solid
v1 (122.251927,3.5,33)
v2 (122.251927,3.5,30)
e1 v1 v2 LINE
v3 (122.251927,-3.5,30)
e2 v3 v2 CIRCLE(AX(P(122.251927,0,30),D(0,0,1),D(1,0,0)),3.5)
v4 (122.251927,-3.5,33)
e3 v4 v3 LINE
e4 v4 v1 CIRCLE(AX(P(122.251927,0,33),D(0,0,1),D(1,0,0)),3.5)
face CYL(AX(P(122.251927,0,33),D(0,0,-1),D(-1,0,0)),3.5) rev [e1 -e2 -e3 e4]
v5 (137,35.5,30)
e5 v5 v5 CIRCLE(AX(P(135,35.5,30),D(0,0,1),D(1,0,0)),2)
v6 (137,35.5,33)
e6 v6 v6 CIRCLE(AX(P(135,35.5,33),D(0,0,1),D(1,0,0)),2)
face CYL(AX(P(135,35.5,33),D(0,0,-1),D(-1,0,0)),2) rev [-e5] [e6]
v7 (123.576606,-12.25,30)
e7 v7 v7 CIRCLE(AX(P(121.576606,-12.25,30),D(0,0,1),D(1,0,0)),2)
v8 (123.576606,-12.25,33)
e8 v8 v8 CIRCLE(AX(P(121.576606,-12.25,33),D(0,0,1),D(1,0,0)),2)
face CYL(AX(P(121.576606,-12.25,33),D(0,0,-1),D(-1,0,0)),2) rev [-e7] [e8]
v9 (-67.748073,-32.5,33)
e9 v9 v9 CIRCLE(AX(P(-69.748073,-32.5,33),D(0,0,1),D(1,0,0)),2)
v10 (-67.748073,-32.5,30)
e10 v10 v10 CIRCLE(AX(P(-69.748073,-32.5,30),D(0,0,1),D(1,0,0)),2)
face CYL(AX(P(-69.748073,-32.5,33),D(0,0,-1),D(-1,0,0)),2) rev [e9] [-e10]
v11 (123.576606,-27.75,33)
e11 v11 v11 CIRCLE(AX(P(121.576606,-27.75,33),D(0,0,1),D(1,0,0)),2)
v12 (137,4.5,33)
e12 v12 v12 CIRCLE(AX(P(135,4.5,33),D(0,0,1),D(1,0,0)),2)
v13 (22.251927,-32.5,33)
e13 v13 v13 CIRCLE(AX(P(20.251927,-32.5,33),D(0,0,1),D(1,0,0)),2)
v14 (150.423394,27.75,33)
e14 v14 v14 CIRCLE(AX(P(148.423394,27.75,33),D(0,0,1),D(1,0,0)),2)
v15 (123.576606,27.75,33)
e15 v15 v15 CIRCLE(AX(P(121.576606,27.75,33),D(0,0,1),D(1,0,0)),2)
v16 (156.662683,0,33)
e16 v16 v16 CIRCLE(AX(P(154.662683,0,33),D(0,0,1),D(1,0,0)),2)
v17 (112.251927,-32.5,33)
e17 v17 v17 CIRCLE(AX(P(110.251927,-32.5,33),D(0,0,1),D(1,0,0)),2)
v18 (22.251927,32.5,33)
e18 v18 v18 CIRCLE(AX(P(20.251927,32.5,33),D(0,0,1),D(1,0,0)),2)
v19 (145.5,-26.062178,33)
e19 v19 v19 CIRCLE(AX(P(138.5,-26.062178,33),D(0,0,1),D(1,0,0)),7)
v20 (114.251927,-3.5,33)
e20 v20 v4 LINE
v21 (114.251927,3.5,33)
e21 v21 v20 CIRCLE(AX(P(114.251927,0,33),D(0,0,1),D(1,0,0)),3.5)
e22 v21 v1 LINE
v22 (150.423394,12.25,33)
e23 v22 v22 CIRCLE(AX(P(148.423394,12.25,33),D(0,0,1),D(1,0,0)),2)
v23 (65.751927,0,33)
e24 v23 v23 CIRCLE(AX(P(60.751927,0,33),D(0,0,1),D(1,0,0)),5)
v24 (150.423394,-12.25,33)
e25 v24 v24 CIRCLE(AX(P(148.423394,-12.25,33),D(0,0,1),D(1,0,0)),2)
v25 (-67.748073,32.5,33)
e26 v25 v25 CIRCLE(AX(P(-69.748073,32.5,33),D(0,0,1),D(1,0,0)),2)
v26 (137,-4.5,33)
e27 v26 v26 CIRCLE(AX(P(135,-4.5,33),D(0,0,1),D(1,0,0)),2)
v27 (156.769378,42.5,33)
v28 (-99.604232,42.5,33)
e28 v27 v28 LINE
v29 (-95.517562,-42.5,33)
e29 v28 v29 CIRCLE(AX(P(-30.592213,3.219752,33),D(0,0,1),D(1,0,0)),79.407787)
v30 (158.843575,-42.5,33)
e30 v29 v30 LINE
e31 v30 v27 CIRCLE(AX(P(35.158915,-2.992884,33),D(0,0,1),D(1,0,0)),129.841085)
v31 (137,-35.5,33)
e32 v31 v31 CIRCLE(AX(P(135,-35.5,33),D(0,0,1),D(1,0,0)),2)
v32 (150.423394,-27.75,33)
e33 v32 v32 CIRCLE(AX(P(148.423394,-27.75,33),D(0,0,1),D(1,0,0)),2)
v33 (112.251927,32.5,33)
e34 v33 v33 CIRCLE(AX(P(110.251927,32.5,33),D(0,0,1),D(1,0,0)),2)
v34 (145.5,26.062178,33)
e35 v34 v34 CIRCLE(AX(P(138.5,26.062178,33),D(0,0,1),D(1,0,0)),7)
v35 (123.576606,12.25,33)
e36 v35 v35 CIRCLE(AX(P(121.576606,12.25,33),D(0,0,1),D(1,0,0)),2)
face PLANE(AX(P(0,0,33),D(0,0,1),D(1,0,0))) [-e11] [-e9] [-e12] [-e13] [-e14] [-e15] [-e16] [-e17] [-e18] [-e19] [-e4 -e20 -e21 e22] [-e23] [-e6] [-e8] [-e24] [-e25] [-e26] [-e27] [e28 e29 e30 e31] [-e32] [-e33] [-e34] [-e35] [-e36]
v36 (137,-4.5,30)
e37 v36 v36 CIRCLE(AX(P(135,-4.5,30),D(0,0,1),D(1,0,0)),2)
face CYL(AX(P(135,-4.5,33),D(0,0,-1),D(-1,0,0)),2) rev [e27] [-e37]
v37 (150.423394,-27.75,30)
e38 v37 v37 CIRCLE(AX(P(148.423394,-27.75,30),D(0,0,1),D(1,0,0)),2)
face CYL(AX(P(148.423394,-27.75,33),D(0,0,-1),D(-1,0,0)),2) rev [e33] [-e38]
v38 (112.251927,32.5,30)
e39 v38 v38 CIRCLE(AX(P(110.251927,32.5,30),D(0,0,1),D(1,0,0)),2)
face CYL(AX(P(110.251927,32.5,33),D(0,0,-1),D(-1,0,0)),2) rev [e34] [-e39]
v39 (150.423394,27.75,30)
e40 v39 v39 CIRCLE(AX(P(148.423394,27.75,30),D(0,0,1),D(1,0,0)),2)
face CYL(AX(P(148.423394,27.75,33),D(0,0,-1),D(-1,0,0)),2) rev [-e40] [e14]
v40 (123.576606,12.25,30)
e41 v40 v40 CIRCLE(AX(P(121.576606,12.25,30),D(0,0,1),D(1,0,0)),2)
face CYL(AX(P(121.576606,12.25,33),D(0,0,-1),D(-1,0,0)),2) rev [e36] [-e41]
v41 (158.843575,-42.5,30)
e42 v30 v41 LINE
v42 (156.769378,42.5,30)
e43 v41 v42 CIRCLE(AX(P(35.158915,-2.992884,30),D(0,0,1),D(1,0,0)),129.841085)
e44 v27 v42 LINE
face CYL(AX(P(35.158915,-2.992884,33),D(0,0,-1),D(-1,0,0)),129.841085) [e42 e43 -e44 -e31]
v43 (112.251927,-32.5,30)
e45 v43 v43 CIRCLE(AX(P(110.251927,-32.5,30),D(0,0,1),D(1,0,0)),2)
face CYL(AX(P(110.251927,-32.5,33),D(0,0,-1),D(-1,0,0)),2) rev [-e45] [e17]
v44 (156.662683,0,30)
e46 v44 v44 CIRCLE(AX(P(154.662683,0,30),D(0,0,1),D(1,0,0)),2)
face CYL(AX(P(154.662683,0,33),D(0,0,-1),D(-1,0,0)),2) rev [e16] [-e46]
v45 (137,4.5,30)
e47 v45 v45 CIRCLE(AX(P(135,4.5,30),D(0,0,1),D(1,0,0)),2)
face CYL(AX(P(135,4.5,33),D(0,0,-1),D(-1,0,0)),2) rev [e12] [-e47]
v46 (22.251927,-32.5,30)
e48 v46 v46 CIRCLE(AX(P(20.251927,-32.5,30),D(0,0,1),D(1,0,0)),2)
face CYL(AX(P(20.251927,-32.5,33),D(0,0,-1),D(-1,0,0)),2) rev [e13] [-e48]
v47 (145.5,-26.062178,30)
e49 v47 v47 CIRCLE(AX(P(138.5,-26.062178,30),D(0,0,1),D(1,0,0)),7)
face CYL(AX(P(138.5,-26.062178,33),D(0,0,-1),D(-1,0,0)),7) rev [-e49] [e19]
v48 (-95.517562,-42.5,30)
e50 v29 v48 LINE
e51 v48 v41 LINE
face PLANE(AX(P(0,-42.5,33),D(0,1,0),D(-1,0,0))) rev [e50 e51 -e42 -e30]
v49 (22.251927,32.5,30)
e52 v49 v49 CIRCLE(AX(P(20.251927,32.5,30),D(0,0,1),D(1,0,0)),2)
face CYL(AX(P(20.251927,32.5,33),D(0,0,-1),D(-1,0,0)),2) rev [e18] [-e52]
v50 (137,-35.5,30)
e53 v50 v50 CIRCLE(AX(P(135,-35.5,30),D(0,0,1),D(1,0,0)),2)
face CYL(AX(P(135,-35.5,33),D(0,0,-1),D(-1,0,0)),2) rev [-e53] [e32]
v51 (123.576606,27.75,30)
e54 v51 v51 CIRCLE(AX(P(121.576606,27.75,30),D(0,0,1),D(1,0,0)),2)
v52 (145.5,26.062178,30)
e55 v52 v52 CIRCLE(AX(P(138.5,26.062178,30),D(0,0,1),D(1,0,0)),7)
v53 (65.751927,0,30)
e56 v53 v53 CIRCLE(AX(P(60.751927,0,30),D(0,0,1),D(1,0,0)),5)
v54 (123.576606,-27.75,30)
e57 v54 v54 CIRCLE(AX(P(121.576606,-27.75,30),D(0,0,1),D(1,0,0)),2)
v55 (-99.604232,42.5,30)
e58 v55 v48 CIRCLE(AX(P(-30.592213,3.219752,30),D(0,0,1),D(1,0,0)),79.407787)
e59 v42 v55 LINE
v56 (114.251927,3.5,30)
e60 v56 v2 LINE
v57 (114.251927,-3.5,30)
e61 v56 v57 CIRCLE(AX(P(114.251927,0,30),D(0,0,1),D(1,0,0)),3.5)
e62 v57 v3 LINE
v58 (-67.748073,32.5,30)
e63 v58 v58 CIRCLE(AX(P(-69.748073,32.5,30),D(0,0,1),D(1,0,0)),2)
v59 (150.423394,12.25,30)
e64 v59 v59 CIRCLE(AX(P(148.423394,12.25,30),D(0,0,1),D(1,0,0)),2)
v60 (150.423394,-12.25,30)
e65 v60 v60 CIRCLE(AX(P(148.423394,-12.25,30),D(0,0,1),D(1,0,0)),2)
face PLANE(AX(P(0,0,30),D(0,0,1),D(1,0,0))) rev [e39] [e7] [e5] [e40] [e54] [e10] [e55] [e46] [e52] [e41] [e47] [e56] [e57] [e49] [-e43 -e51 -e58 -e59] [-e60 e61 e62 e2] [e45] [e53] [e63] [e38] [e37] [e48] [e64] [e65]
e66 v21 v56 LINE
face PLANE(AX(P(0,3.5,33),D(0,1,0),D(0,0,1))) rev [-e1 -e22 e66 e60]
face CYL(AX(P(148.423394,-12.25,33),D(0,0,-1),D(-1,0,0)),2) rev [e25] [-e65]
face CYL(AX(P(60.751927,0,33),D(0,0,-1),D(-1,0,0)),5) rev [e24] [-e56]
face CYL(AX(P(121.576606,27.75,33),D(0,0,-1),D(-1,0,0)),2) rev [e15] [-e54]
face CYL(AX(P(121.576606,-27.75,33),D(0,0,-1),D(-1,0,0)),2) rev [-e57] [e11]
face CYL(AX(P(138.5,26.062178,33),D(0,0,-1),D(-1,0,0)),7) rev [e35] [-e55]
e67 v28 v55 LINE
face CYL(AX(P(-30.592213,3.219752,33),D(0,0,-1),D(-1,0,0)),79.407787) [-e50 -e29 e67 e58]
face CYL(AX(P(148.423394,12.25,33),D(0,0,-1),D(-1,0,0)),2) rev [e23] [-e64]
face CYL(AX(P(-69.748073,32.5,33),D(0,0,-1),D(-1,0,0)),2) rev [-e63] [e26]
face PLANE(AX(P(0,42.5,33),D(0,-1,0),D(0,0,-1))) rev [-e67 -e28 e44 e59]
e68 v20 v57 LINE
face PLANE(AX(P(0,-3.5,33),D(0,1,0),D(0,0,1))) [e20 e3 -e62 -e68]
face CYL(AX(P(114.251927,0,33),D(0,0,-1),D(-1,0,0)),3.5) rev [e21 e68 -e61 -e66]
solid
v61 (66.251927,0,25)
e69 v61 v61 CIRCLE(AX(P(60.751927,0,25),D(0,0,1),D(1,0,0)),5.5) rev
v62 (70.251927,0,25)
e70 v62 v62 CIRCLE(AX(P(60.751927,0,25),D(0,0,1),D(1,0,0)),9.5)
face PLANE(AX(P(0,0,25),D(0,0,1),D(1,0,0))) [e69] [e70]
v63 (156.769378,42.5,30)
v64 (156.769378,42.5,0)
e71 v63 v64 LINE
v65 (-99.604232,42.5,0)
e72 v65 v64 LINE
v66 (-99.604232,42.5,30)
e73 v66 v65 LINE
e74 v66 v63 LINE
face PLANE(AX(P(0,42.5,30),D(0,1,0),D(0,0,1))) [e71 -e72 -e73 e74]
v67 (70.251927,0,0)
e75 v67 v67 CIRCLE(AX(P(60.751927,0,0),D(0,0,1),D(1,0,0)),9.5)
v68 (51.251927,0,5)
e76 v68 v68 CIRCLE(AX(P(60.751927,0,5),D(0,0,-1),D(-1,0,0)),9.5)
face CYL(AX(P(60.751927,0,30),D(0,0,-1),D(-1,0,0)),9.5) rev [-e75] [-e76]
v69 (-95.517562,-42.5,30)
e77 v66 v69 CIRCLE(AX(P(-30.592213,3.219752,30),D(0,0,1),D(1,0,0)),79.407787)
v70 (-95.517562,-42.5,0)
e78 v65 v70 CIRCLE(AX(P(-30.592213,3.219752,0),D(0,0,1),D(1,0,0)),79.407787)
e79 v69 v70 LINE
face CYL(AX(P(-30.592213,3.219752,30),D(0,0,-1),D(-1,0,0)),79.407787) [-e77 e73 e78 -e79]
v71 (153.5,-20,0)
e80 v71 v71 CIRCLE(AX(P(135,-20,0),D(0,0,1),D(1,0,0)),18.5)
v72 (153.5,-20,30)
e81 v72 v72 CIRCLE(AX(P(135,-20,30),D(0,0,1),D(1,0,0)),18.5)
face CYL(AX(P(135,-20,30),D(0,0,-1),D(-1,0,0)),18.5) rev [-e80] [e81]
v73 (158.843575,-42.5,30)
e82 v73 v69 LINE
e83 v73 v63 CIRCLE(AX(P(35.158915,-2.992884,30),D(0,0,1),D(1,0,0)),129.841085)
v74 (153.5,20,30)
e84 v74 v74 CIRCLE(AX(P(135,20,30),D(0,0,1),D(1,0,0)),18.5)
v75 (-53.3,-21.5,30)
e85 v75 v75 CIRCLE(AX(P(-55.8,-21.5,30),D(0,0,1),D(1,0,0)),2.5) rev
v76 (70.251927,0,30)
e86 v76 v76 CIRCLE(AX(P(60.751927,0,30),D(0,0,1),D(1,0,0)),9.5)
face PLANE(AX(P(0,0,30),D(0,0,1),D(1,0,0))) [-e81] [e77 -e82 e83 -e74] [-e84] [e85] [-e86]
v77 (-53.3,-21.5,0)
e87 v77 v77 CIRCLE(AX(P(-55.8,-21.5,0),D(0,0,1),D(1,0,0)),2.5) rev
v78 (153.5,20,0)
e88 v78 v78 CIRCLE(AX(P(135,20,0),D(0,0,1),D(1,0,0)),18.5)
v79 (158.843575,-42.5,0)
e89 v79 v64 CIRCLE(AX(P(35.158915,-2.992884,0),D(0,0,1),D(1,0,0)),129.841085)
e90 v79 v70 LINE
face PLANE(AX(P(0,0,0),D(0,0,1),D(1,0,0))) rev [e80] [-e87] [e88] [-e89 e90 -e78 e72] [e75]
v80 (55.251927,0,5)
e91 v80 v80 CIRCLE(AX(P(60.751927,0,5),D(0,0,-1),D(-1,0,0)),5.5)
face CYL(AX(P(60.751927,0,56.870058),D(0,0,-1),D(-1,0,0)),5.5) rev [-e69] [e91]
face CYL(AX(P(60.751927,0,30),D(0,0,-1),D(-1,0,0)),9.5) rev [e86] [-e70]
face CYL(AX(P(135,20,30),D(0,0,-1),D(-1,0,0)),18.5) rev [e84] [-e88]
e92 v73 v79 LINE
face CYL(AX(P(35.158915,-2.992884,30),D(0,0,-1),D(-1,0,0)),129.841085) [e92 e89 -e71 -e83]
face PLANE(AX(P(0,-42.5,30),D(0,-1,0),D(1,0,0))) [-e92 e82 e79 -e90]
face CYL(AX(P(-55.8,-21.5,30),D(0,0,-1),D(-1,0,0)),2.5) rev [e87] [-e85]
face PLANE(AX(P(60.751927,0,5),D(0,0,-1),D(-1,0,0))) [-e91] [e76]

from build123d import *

# Parameters (mm, degrees)
BOSS_EXTRUDE1_OUTLINE_R   = 2.5
BOSS_EXTRUDE1_OUTLINE_R_2 = 18.5
BOSS_EXTRUDE1_OUTLINE_R_3 = 9.5
BOSS_EXTRUDE1_DEPTH       = 30
SKETCH3_R                 = 2
SKETCH3_R_2               = 2.5
SKETCH3_R_3               = 18.5
SKETCH3_R_4               = 9.5
SKETCH3_R_5               = 7
SKETCH3_R_6               = 5
BOSS_EXTRUDE2_DEPTH       = 3
BOSS_EXTRUDE3_START       = -5
SKETCH6_R                 = 9.5
SKETCH6_R_2               = 5.5
BOSS_EXTRUDE3_DEPTH       = 20


# Read off the part's stored shape, not the designer's step: Boss-Extrude1
with BuildPart() as part:
    # Boss-Extrude1 outline → Boss-Extrude1 (new body)
    with BuildSketch(Plane.XY):
        with BuildLine():
            ThreePointArc((-99.604231658, 42.5), (-109.908381706, -0.593648146), (-95.517561959, -42.5))
            Line((-95.517561959, -42.5), (158.843575198, -42.5))
            ThreePointArc((158.843575198, -42.5), (164.961358829, 0.174595682), (156.769378449, 42.5))
            Line((156.769378449, 42.5), (-99.604231658, 42.5))
        make_face()
        with Locations((-55.8, -21.5)):
            Circle(BOSS_EXTRUDE1_OUTLINE_R, mode=Mode.SUBTRACT)
        with Locations((135, -20)):
            Circle(BOSS_EXTRUDE1_OUTLINE_R_2, mode=Mode.SUBTRACT)
        with Locations((60.751926796, 0)):
            Circle(BOSS_EXTRUDE1_OUTLINE_R_3, mode=Mode.SUBTRACT)
        with Locations((135, 20)):
            Circle(BOSS_EXTRUDE1_OUTLINE_R_2, mode=Mode.SUBTRACT)
    extrude(amount=BOSS_EXTRUDE1_DEPTH)

    # Sketch6 → Boss-Extrude3 (add)
    with BuildSketch(Plane(origin=(0, 0, 0), x_dir=(-1, 0, 0), z_dir=(0, 0, -1)).offset(BOSS_EXTRUDE3_START)):
        with Locations((-60.751926796, 0)):
            Circle(SKETCH6_R)
        with Locations((-60.751926796, 0)):
            Circle(SKETCH6_R_2, mode=Mode.SUBTRACT)
    extrude(amount=-BOSS_EXTRUDE3_DEPTH)


with BuildPart() as body_2:
    # Sketch3 → Boss-Extrude2 (new body)
    # profile 1 of 7: a face of its own
    with BuildSketch(Plane.XY.offset(30)):
        with BuildLine():
            ThreePointArc((-99.604231658, 42.5), (-109.908381706, -0.593648146), (-95.517561959, -42.5))
            Line((-95.517561959, -42.5), (-88.525744823, -42.5))
            ThreePointArc((-88.525744823, -42.5), (-94.643528454, 0.174595682), (-86.451548074, 42.5))
            Line((-86.451548074, 42.5), (-99.604231658, 42.5))
        make_face()
    # profile 2 of 7: a face of its own
    with BuildSketch(Plane.XY.offset(30)):
        with BuildLine():
            ThreePointArc((-86.451548074, 42.5), (-94.643528454, 0.174595682), (-88.525744823, -42.5))
            Line((-88.525744823, -42.5), (34.333135379, -42.5))
            ThreePointArc((34.333135379, -42.5), (45.108430133, -20.759597294), (48.81557342, 3.219751644))
            ThreePointArc((48.81557342, 3.219751644), (46.172649196, 23.536062273), (38.419805078, 42.5))
            Line((38.419805078, 42.5), (-86.451548074, 42.5))
        make_face()
        with Locations((-69.748073204, -32.5)):
            Circle(SKETCH3_R, mode=Mode.SUBTRACT)
        with Locations((-55.8, -21.5)):
            Circle(SKETCH3_R_2, mode=Mode.SUBTRACT)
        with Locations((20.251926796, -32.5)):
            Circle(SKETCH3_R, mode=Mode.SUBTRACT)
        with Locations((-69.748073204, 32.5)):
            Circle(SKETCH3_R, mode=Mode.SUBTRACT)
        with Locations((20.251926796, 32.5)):
            Circle(SKETCH3_R, mode=Mode.SUBTRACT)
    # profile 3 of 7: a face of its own
    with BuildSketch(Plane.XY.offset(30)):
        with BuildLine():
            ThreePointArc((48.81557342, 3.219751644), (45.108430133, -20.759597294), (34.333135379, -42.5))
            Line((34.333135379, -42.5), (158.843575198, -42.5))
            ThreePointArc((158.843575198, -42.5), (163.451661934, -22.984843715), (165, -2.992884395))
            ThreePointArc((165, -2.992884395), (162.925776657, 20.122833535), (156.769378449, 42.5))
            Line((156.769378449, 42.5), (38.419805078, 42.5))
            ThreePointArc((38.419805078, 42.5), (46.172649196, 23.536062273), (48.81557342, 3.219751644))
        make_face()
        with Locations((110.251926796, -32.5)):
            Circle(SKETCH3_R, mode=Mode.SUBTRACT)
        with Locations((135, -20)):
            Circle(SKETCH3_R_3, mode=Mode.SUBTRACT)
        with Locations((60.751926796, 0)):
            Circle(SKETCH3_R_4, mode=Mode.SUBTRACT)
        with BuildLine():
            ThreePointArc((114.251926796, -3.5), (110.751926796, 0), (114.251926796, 3.5))
            Line((114.251926796, 3.5), (122.251926796, 3.5))
            ThreePointArc((122.251926796, 3.5), (125.751926796, 0), (122.251926796, -3.5))
            Line((122.251926796, -3.5), (114.251926796, -3.5))
        make_face(mode=Mode.SUBTRACT)
        with Locations((154.66268289, 0)):
            Circle(SKETCH3_R, mode=Mode.SUBTRACT)
        with Locations((135, 20)):
            Circle(SKETCH3_R_3, mode=Mode.SUBTRACT)
        with Locations((110.251926796, 32.5)):
            Circle(SKETCH3_R, mode=Mode.SUBTRACT)
    # profile 4 of 7: a face of its own
    with BuildSketch(Plane.XY.offset(30)):
        with Locations((135, 20)):
            Circle(SKETCH3_R_3)
        with Locations((138.5, 26.062177826)):
            Circle(SKETCH3_R_5, mode=Mode.SUBTRACT)
        with Locations((135, 35.5)):
            Circle(SKETCH3_R, mode=Mode.SUBTRACT)
        with Locations((121.576606241, 27.75)):
            Circle(SKETCH3_R, mode=Mode.SUBTRACT)
        with Locations((135, 4.5)):
            Circle(SKETCH3_R, mode=Mode.SUBTRACT)
        with Locations((121.576606241, 12.25)):
            Circle(SKETCH3_R, mode=Mode.SUBTRACT)
        with Locations((148.423393759, 12.25)):
            Circle(SKETCH3_R, mode=Mode.SUBTRACT)
        with Locations((148.423393759, 27.75)):
            Circle(SKETCH3_R, mode=Mode.SUBTRACT)
    # profile 5 of 7: a face of its own
    with BuildSketch(Plane.XY.offset(30)):
        with Locations((135, -20)):
            Circle(SKETCH3_R_3)
        with Locations((135, -35.5)):
            Circle(SKETCH3_R, mode=Mode.SUBTRACT)
        with Locations((148.423393759, -27.75)):
            Circle(SKETCH3_R, mode=Mode.SUBTRACT)
        with Locations((148.423393759, -12.25)):
            Circle(SKETCH3_R, mode=Mode.SUBTRACT)
        with Locations((135, -4.5)):
            Circle(SKETCH3_R, mode=Mode.SUBTRACT)
        with Locations((121.576606241, -12.25)):
            Circle(SKETCH3_R, mode=Mode.SUBTRACT)
        with Locations((121.576606241, -27.75)):
            Circle(SKETCH3_R, mode=Mode.SUBTRACT)
        with Locations((138.5, -26.062177826)):
            Circle(SKETCH3_R_5, mode=Mode.SUBTRACT)
    # profile 6 of 7: a face of its own
    with BuildSketch(Plane.XY.offset(30)):
        with Locations((60.751926796, 0)):
            Circle(SKETCH3_R_4)
        with Locations((60.751926796, 0)):
            Circle(SKETCH3_R_6, mode=Mode.SUBTRACT)
    # profile 7 of 7: a face of its own
    with BuildSketch(Plane.XY.offset(30)):
        with Locations((-55.8, -21.5)):
            Circle(SKETCH3_R_2)
    extrude(amount=BOSS_EXTRUDE2_DEPTH)


solid = Compound([part.part, body_2.part])
